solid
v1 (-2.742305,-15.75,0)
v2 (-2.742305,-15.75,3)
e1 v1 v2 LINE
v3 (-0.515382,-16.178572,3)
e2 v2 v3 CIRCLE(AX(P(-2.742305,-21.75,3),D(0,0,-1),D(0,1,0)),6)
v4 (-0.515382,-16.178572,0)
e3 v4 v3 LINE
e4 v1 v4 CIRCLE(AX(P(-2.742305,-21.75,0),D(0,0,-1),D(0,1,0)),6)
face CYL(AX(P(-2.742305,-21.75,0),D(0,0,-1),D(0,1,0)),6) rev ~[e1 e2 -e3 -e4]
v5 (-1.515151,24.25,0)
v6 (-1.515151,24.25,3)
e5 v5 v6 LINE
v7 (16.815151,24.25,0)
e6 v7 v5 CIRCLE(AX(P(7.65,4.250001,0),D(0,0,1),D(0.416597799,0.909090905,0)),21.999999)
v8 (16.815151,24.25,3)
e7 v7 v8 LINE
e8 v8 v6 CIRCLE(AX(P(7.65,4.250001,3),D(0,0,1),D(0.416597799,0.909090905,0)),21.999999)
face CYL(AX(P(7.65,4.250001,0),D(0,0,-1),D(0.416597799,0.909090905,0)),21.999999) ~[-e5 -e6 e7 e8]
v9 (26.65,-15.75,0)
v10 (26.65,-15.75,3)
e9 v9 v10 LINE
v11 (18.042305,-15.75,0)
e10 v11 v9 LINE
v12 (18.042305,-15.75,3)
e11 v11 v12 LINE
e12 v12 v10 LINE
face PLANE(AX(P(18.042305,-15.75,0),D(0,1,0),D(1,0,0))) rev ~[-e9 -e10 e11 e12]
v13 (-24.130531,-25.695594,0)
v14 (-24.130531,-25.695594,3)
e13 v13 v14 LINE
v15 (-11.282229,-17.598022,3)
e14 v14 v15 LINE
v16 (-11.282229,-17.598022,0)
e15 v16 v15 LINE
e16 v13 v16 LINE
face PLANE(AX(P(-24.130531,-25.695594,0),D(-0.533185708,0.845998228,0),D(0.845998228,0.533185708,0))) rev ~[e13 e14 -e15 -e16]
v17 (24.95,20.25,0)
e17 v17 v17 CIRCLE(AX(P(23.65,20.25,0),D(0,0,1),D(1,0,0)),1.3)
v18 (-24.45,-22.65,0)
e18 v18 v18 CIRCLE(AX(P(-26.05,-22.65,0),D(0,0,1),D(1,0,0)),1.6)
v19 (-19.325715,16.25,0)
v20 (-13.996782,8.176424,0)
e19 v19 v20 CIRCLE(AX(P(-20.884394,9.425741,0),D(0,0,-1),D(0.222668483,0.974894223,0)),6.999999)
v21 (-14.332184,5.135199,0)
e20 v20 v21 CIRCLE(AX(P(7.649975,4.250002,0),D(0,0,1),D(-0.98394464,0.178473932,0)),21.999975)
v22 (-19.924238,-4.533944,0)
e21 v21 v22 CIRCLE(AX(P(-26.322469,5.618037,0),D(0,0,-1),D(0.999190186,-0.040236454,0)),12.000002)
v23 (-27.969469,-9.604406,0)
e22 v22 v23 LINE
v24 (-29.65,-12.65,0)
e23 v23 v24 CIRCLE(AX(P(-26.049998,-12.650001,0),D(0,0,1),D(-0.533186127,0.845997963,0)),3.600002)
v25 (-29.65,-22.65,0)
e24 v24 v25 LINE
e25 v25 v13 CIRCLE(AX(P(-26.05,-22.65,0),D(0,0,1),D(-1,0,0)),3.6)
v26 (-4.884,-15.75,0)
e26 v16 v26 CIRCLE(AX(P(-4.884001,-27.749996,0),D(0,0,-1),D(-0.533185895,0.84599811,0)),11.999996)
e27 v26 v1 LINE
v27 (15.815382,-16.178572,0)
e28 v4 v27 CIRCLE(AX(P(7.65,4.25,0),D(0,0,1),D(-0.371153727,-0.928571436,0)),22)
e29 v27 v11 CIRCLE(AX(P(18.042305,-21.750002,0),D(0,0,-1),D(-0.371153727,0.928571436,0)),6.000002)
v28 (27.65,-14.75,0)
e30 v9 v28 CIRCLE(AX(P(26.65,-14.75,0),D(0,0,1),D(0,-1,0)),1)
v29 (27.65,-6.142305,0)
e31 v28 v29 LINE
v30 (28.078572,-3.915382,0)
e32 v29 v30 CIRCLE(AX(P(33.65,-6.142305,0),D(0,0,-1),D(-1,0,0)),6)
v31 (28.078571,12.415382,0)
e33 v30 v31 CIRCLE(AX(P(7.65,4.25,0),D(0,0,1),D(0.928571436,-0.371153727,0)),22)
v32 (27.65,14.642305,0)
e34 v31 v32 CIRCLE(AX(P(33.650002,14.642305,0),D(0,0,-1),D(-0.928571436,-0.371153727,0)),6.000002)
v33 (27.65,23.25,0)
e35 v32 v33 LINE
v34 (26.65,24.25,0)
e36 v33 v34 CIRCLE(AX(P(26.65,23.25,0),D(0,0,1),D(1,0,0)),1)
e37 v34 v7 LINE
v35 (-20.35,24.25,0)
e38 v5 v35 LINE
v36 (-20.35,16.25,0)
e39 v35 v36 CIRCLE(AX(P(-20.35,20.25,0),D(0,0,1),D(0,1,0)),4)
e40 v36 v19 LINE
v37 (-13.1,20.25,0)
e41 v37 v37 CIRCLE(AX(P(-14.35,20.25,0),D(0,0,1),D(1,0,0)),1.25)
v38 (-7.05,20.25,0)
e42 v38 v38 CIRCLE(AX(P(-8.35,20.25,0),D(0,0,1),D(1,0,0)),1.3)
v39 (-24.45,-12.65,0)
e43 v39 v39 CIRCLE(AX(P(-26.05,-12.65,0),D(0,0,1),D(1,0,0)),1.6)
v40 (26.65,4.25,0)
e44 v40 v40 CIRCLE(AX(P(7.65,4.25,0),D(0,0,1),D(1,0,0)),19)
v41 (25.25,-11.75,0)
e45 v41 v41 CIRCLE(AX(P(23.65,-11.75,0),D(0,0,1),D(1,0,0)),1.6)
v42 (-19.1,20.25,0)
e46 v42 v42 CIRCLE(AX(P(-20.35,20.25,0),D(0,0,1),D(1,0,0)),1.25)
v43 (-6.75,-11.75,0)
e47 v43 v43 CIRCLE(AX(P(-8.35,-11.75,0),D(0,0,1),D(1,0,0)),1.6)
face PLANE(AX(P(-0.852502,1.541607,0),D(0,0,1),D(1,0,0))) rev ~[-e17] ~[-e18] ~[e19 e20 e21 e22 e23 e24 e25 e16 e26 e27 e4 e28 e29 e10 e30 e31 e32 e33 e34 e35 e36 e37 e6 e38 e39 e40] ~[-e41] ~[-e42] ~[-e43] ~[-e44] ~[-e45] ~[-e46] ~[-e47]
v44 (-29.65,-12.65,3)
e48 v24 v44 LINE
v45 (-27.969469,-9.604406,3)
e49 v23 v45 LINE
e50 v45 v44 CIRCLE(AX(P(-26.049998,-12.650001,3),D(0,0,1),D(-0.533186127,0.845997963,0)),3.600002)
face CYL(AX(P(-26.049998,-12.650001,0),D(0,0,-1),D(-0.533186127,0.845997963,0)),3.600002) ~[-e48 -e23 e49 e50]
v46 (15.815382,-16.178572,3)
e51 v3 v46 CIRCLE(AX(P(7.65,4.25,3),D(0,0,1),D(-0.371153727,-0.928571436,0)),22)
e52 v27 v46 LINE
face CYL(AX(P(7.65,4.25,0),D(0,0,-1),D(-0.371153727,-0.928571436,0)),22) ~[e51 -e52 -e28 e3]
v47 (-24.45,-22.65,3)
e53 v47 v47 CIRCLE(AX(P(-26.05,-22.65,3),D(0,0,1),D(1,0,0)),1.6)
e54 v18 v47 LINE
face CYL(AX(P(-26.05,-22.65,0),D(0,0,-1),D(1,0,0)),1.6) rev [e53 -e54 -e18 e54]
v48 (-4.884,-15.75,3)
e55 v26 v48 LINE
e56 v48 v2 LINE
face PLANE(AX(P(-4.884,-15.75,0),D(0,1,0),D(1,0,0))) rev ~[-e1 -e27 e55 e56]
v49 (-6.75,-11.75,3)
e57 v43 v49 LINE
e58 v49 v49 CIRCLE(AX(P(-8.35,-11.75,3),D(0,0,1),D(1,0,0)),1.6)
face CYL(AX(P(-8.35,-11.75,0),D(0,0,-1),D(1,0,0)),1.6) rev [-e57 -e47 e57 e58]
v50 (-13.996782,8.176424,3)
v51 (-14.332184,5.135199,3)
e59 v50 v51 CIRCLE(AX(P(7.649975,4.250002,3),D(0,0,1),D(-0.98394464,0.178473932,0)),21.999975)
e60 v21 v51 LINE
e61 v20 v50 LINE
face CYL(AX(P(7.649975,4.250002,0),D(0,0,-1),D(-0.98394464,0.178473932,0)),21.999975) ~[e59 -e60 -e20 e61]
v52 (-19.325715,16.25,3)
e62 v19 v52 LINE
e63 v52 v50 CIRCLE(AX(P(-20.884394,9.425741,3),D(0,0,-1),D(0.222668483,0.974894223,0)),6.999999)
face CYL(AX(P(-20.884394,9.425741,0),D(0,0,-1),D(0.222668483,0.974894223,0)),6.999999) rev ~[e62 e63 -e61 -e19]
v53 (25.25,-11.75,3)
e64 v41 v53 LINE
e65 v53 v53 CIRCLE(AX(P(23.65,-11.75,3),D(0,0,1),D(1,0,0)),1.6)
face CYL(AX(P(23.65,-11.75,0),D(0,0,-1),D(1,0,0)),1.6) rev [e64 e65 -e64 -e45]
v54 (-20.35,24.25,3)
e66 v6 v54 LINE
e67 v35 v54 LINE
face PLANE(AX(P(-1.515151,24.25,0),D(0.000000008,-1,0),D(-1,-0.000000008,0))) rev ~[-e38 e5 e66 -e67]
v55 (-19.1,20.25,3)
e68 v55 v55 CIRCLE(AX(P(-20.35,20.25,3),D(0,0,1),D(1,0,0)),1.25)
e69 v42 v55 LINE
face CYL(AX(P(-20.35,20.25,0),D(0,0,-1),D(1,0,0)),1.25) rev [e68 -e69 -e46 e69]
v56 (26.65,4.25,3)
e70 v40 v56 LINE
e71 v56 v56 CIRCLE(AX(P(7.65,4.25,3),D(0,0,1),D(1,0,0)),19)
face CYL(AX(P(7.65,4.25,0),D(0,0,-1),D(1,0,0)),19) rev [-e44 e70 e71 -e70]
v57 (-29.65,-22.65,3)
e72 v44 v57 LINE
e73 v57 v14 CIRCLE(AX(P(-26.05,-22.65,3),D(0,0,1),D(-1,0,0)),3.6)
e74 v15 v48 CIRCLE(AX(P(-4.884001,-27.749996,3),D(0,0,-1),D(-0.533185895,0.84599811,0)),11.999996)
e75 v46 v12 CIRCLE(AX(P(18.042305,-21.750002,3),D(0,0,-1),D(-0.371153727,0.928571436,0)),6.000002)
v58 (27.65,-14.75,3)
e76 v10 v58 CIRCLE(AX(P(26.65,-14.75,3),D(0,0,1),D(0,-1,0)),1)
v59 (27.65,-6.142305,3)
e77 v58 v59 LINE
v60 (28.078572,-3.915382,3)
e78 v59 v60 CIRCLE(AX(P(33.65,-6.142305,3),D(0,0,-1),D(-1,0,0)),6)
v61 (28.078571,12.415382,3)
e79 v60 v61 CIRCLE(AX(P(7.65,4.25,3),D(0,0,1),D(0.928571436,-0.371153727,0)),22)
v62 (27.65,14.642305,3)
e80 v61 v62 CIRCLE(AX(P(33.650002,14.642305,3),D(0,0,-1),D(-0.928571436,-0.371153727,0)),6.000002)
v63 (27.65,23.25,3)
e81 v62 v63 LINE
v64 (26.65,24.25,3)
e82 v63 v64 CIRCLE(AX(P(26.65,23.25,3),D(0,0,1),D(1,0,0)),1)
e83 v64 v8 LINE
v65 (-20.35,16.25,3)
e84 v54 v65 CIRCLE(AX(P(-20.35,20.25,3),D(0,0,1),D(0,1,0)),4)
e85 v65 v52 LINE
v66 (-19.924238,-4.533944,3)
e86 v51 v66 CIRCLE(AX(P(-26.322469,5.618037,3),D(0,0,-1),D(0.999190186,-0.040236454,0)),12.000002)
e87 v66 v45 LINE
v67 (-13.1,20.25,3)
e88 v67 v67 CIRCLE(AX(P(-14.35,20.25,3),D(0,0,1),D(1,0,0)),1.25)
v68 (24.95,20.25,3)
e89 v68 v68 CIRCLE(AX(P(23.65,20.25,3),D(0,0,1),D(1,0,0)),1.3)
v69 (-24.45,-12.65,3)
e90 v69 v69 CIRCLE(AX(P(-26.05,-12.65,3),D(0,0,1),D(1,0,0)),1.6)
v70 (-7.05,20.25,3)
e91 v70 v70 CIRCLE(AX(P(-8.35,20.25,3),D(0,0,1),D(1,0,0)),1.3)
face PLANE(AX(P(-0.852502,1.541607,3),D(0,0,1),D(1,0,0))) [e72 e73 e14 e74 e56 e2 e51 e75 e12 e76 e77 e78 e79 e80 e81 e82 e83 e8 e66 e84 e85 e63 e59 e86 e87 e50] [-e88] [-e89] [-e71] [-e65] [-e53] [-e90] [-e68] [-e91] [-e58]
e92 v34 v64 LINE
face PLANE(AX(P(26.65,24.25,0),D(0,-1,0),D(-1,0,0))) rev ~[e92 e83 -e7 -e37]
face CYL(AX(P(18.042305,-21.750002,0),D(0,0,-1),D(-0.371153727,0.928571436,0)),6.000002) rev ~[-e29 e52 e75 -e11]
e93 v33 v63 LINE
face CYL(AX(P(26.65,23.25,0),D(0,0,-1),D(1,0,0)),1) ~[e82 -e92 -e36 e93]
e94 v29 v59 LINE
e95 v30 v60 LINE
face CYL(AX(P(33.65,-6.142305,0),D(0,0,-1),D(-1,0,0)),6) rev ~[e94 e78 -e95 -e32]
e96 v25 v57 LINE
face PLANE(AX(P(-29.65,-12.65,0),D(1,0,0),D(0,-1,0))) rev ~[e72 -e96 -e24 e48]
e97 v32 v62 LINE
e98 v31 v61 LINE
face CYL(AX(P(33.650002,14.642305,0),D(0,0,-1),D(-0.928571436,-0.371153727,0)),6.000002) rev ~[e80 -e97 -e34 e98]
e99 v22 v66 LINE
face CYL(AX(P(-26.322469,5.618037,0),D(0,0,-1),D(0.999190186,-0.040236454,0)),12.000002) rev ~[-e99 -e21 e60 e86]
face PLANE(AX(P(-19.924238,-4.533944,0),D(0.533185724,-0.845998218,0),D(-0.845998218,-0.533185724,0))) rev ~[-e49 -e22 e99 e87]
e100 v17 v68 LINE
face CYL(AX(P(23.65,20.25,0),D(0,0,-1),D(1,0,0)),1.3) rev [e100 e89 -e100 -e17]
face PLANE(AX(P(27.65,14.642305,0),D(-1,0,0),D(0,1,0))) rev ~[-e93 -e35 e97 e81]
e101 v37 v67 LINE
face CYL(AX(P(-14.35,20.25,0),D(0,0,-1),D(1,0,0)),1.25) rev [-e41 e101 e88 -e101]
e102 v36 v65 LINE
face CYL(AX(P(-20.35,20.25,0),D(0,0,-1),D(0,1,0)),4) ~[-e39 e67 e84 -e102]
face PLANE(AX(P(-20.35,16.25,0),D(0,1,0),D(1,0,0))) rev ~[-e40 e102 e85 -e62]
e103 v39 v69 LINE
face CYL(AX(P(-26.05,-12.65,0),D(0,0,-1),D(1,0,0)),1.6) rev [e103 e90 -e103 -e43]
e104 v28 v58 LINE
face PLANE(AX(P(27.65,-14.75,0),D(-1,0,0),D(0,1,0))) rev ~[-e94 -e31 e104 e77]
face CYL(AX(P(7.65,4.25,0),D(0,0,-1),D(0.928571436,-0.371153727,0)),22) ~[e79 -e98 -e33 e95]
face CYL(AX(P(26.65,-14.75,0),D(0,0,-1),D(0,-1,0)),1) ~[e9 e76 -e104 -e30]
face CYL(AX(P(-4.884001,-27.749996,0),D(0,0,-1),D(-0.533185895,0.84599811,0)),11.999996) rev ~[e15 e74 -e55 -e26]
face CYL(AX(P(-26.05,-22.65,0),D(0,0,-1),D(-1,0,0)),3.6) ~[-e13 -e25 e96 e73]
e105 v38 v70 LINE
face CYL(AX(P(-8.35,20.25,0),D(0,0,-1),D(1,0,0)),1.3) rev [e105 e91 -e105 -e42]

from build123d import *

# Parameters (mm, degrees)
F0_R     = 1.6
F0_R_2   = 1.25
F0_R_3   = 1.3
F0_R_4   = 19
F1_DEPTH = 3


# Not quite as in the source:
# - ends of sketch curves that miss each other by under 0.0002 mm in the source are joined


with BuildPart() as f1:
    # F0 (on Top) → F1 (new body)
    with BuildSketch(Plane.XY):
        with BuildLine():
            ThreePointArc((26.65, -15.75), (27.3571067812, -15.4571067812), (27.65, -14.75))
            Line((27.65, -14.75), (27.65, -6.142305))
            ThreePointArc((27.65, -6.142305), (27.7581169954, -5.008411416), (28.0785715533, -3.9153822211))
            ThreePointArc((28.0785715533, -3.9153822211), (29.65, 4.25), (28.0785715, 12.4153821998))
            ThreePointArc((28.0785715, 12.4153821998), (27.7581169954, 13.508411416), (27.65, 14.642305))
            Line((27.65, 14.642305), (27.65, 23.25))
            ThreePointArc((27.65, 23.25), (27.3571067812, 23.9571067812), (26.65, 24.25))
            Line((26.65, 24.25), (16.815151, 24.25))
            ThreePointArc((16.815151, 24.25), (7.65, 26.25), (-1.5151510677, 24.2500001477))
            Line((-1.5151510677, 24.2500001477), (-20.35, 24.25))
            ThreePointArc((-20.35, 24.25), (-24.35, 20.25), (-20.35, 16.25))
            Line((-20.35, 16.25), (-19.325715, 16.25))
            ThreePointArc((-19.325715, 16.25), (-15.0422529035, 13.2818239509), (-13.9967824398, 8.1764238984))
            ThreePointArc((-13.9967824398, 8.1764238984), (-14.2174174888, 6.6616493047), (-14.3321842117, 5.1351990085))
            ThreePointArc((-14.3321842117, 5.1351990085), (-15.9346176497, -0.3896755352), (-19.9242382655, -4.5339435787))
            Line((-19.9242382655, -4.5339435787), (-27.969469, -9.604406))
            ThreePointArc((-27.969469, -9.604406), (-29.2019904282, -10.9107598382), (-29.65, -12.65))
            Line((-29.65, -12.65), (-29.65, -22.65))
            ThreePointArc((-29.65, -22.65), (-27.7892401618, -25.8019904282), (-24.1305313003, -25.6955935236))
            Line((-24.1305313003, -25.6955935236), (-11.282229, -17.598022))
            ThreePointArc((-11.282229, -17.598022), (-8.2138844175, -16.2212589687), (-4.884, -15.75))
            Line((-4.884, -15.75), (-2.742305, -15.75))
            ThreePointArc((-2.742305, -15.75), (-1.608411416, -15.8581169954), (-0.5153822211, -16.1785715533))
            ThreePointArc((-0.5153822211, -16.1785715533), (7.65, -17.75), (15.8153821998, -16.1785715))
            ThreePointArc((15.8153821998, -16.1785715), (16.908411416, -15.8581169954), (18.042305, -15.75))
            Line((18.042305, -15.75), (26.65, -15.75))
        make_face()
        with Locations((-26.05, -22.65)):
            Circle(F0_R, mode=Mode.SUBTRACT)
        with Locations((-26.05, -12.65)):
            Circle(F0_R, mode=Mode.SUBTRACT)
        with Locations((-8.35, -11.75)):
            Circle(F0_R, mode=Mode.SUBTRACT)
        with Locations((23.65, -11.75)):
            Circle(F0_R, mode=Mode.SUBTRACT)
        with Locations((-20.35, 20.25)):
            Circle(F0_R_2, mode=Mode.SUBTRACT)
        with Locations((-14.35, 20.25)):
            Circle(F0_R_2, mode=Mode.SUBTRACT)
        with Locations((-8.35, 20.25)):
            Circle(F0_R_3, mode=Mode.SUBTRACT)
        with Locations((7.65, 4.25)):
            Circle(F0_R_4, mode=Mode.SUBTRACT)
        with Locations((23.65, 20.25)):
            Circle(F0_R_3, mode=Mode.SUBTRACT)
    extrude(amount=F1_DEPTH)


solid = f1.part
